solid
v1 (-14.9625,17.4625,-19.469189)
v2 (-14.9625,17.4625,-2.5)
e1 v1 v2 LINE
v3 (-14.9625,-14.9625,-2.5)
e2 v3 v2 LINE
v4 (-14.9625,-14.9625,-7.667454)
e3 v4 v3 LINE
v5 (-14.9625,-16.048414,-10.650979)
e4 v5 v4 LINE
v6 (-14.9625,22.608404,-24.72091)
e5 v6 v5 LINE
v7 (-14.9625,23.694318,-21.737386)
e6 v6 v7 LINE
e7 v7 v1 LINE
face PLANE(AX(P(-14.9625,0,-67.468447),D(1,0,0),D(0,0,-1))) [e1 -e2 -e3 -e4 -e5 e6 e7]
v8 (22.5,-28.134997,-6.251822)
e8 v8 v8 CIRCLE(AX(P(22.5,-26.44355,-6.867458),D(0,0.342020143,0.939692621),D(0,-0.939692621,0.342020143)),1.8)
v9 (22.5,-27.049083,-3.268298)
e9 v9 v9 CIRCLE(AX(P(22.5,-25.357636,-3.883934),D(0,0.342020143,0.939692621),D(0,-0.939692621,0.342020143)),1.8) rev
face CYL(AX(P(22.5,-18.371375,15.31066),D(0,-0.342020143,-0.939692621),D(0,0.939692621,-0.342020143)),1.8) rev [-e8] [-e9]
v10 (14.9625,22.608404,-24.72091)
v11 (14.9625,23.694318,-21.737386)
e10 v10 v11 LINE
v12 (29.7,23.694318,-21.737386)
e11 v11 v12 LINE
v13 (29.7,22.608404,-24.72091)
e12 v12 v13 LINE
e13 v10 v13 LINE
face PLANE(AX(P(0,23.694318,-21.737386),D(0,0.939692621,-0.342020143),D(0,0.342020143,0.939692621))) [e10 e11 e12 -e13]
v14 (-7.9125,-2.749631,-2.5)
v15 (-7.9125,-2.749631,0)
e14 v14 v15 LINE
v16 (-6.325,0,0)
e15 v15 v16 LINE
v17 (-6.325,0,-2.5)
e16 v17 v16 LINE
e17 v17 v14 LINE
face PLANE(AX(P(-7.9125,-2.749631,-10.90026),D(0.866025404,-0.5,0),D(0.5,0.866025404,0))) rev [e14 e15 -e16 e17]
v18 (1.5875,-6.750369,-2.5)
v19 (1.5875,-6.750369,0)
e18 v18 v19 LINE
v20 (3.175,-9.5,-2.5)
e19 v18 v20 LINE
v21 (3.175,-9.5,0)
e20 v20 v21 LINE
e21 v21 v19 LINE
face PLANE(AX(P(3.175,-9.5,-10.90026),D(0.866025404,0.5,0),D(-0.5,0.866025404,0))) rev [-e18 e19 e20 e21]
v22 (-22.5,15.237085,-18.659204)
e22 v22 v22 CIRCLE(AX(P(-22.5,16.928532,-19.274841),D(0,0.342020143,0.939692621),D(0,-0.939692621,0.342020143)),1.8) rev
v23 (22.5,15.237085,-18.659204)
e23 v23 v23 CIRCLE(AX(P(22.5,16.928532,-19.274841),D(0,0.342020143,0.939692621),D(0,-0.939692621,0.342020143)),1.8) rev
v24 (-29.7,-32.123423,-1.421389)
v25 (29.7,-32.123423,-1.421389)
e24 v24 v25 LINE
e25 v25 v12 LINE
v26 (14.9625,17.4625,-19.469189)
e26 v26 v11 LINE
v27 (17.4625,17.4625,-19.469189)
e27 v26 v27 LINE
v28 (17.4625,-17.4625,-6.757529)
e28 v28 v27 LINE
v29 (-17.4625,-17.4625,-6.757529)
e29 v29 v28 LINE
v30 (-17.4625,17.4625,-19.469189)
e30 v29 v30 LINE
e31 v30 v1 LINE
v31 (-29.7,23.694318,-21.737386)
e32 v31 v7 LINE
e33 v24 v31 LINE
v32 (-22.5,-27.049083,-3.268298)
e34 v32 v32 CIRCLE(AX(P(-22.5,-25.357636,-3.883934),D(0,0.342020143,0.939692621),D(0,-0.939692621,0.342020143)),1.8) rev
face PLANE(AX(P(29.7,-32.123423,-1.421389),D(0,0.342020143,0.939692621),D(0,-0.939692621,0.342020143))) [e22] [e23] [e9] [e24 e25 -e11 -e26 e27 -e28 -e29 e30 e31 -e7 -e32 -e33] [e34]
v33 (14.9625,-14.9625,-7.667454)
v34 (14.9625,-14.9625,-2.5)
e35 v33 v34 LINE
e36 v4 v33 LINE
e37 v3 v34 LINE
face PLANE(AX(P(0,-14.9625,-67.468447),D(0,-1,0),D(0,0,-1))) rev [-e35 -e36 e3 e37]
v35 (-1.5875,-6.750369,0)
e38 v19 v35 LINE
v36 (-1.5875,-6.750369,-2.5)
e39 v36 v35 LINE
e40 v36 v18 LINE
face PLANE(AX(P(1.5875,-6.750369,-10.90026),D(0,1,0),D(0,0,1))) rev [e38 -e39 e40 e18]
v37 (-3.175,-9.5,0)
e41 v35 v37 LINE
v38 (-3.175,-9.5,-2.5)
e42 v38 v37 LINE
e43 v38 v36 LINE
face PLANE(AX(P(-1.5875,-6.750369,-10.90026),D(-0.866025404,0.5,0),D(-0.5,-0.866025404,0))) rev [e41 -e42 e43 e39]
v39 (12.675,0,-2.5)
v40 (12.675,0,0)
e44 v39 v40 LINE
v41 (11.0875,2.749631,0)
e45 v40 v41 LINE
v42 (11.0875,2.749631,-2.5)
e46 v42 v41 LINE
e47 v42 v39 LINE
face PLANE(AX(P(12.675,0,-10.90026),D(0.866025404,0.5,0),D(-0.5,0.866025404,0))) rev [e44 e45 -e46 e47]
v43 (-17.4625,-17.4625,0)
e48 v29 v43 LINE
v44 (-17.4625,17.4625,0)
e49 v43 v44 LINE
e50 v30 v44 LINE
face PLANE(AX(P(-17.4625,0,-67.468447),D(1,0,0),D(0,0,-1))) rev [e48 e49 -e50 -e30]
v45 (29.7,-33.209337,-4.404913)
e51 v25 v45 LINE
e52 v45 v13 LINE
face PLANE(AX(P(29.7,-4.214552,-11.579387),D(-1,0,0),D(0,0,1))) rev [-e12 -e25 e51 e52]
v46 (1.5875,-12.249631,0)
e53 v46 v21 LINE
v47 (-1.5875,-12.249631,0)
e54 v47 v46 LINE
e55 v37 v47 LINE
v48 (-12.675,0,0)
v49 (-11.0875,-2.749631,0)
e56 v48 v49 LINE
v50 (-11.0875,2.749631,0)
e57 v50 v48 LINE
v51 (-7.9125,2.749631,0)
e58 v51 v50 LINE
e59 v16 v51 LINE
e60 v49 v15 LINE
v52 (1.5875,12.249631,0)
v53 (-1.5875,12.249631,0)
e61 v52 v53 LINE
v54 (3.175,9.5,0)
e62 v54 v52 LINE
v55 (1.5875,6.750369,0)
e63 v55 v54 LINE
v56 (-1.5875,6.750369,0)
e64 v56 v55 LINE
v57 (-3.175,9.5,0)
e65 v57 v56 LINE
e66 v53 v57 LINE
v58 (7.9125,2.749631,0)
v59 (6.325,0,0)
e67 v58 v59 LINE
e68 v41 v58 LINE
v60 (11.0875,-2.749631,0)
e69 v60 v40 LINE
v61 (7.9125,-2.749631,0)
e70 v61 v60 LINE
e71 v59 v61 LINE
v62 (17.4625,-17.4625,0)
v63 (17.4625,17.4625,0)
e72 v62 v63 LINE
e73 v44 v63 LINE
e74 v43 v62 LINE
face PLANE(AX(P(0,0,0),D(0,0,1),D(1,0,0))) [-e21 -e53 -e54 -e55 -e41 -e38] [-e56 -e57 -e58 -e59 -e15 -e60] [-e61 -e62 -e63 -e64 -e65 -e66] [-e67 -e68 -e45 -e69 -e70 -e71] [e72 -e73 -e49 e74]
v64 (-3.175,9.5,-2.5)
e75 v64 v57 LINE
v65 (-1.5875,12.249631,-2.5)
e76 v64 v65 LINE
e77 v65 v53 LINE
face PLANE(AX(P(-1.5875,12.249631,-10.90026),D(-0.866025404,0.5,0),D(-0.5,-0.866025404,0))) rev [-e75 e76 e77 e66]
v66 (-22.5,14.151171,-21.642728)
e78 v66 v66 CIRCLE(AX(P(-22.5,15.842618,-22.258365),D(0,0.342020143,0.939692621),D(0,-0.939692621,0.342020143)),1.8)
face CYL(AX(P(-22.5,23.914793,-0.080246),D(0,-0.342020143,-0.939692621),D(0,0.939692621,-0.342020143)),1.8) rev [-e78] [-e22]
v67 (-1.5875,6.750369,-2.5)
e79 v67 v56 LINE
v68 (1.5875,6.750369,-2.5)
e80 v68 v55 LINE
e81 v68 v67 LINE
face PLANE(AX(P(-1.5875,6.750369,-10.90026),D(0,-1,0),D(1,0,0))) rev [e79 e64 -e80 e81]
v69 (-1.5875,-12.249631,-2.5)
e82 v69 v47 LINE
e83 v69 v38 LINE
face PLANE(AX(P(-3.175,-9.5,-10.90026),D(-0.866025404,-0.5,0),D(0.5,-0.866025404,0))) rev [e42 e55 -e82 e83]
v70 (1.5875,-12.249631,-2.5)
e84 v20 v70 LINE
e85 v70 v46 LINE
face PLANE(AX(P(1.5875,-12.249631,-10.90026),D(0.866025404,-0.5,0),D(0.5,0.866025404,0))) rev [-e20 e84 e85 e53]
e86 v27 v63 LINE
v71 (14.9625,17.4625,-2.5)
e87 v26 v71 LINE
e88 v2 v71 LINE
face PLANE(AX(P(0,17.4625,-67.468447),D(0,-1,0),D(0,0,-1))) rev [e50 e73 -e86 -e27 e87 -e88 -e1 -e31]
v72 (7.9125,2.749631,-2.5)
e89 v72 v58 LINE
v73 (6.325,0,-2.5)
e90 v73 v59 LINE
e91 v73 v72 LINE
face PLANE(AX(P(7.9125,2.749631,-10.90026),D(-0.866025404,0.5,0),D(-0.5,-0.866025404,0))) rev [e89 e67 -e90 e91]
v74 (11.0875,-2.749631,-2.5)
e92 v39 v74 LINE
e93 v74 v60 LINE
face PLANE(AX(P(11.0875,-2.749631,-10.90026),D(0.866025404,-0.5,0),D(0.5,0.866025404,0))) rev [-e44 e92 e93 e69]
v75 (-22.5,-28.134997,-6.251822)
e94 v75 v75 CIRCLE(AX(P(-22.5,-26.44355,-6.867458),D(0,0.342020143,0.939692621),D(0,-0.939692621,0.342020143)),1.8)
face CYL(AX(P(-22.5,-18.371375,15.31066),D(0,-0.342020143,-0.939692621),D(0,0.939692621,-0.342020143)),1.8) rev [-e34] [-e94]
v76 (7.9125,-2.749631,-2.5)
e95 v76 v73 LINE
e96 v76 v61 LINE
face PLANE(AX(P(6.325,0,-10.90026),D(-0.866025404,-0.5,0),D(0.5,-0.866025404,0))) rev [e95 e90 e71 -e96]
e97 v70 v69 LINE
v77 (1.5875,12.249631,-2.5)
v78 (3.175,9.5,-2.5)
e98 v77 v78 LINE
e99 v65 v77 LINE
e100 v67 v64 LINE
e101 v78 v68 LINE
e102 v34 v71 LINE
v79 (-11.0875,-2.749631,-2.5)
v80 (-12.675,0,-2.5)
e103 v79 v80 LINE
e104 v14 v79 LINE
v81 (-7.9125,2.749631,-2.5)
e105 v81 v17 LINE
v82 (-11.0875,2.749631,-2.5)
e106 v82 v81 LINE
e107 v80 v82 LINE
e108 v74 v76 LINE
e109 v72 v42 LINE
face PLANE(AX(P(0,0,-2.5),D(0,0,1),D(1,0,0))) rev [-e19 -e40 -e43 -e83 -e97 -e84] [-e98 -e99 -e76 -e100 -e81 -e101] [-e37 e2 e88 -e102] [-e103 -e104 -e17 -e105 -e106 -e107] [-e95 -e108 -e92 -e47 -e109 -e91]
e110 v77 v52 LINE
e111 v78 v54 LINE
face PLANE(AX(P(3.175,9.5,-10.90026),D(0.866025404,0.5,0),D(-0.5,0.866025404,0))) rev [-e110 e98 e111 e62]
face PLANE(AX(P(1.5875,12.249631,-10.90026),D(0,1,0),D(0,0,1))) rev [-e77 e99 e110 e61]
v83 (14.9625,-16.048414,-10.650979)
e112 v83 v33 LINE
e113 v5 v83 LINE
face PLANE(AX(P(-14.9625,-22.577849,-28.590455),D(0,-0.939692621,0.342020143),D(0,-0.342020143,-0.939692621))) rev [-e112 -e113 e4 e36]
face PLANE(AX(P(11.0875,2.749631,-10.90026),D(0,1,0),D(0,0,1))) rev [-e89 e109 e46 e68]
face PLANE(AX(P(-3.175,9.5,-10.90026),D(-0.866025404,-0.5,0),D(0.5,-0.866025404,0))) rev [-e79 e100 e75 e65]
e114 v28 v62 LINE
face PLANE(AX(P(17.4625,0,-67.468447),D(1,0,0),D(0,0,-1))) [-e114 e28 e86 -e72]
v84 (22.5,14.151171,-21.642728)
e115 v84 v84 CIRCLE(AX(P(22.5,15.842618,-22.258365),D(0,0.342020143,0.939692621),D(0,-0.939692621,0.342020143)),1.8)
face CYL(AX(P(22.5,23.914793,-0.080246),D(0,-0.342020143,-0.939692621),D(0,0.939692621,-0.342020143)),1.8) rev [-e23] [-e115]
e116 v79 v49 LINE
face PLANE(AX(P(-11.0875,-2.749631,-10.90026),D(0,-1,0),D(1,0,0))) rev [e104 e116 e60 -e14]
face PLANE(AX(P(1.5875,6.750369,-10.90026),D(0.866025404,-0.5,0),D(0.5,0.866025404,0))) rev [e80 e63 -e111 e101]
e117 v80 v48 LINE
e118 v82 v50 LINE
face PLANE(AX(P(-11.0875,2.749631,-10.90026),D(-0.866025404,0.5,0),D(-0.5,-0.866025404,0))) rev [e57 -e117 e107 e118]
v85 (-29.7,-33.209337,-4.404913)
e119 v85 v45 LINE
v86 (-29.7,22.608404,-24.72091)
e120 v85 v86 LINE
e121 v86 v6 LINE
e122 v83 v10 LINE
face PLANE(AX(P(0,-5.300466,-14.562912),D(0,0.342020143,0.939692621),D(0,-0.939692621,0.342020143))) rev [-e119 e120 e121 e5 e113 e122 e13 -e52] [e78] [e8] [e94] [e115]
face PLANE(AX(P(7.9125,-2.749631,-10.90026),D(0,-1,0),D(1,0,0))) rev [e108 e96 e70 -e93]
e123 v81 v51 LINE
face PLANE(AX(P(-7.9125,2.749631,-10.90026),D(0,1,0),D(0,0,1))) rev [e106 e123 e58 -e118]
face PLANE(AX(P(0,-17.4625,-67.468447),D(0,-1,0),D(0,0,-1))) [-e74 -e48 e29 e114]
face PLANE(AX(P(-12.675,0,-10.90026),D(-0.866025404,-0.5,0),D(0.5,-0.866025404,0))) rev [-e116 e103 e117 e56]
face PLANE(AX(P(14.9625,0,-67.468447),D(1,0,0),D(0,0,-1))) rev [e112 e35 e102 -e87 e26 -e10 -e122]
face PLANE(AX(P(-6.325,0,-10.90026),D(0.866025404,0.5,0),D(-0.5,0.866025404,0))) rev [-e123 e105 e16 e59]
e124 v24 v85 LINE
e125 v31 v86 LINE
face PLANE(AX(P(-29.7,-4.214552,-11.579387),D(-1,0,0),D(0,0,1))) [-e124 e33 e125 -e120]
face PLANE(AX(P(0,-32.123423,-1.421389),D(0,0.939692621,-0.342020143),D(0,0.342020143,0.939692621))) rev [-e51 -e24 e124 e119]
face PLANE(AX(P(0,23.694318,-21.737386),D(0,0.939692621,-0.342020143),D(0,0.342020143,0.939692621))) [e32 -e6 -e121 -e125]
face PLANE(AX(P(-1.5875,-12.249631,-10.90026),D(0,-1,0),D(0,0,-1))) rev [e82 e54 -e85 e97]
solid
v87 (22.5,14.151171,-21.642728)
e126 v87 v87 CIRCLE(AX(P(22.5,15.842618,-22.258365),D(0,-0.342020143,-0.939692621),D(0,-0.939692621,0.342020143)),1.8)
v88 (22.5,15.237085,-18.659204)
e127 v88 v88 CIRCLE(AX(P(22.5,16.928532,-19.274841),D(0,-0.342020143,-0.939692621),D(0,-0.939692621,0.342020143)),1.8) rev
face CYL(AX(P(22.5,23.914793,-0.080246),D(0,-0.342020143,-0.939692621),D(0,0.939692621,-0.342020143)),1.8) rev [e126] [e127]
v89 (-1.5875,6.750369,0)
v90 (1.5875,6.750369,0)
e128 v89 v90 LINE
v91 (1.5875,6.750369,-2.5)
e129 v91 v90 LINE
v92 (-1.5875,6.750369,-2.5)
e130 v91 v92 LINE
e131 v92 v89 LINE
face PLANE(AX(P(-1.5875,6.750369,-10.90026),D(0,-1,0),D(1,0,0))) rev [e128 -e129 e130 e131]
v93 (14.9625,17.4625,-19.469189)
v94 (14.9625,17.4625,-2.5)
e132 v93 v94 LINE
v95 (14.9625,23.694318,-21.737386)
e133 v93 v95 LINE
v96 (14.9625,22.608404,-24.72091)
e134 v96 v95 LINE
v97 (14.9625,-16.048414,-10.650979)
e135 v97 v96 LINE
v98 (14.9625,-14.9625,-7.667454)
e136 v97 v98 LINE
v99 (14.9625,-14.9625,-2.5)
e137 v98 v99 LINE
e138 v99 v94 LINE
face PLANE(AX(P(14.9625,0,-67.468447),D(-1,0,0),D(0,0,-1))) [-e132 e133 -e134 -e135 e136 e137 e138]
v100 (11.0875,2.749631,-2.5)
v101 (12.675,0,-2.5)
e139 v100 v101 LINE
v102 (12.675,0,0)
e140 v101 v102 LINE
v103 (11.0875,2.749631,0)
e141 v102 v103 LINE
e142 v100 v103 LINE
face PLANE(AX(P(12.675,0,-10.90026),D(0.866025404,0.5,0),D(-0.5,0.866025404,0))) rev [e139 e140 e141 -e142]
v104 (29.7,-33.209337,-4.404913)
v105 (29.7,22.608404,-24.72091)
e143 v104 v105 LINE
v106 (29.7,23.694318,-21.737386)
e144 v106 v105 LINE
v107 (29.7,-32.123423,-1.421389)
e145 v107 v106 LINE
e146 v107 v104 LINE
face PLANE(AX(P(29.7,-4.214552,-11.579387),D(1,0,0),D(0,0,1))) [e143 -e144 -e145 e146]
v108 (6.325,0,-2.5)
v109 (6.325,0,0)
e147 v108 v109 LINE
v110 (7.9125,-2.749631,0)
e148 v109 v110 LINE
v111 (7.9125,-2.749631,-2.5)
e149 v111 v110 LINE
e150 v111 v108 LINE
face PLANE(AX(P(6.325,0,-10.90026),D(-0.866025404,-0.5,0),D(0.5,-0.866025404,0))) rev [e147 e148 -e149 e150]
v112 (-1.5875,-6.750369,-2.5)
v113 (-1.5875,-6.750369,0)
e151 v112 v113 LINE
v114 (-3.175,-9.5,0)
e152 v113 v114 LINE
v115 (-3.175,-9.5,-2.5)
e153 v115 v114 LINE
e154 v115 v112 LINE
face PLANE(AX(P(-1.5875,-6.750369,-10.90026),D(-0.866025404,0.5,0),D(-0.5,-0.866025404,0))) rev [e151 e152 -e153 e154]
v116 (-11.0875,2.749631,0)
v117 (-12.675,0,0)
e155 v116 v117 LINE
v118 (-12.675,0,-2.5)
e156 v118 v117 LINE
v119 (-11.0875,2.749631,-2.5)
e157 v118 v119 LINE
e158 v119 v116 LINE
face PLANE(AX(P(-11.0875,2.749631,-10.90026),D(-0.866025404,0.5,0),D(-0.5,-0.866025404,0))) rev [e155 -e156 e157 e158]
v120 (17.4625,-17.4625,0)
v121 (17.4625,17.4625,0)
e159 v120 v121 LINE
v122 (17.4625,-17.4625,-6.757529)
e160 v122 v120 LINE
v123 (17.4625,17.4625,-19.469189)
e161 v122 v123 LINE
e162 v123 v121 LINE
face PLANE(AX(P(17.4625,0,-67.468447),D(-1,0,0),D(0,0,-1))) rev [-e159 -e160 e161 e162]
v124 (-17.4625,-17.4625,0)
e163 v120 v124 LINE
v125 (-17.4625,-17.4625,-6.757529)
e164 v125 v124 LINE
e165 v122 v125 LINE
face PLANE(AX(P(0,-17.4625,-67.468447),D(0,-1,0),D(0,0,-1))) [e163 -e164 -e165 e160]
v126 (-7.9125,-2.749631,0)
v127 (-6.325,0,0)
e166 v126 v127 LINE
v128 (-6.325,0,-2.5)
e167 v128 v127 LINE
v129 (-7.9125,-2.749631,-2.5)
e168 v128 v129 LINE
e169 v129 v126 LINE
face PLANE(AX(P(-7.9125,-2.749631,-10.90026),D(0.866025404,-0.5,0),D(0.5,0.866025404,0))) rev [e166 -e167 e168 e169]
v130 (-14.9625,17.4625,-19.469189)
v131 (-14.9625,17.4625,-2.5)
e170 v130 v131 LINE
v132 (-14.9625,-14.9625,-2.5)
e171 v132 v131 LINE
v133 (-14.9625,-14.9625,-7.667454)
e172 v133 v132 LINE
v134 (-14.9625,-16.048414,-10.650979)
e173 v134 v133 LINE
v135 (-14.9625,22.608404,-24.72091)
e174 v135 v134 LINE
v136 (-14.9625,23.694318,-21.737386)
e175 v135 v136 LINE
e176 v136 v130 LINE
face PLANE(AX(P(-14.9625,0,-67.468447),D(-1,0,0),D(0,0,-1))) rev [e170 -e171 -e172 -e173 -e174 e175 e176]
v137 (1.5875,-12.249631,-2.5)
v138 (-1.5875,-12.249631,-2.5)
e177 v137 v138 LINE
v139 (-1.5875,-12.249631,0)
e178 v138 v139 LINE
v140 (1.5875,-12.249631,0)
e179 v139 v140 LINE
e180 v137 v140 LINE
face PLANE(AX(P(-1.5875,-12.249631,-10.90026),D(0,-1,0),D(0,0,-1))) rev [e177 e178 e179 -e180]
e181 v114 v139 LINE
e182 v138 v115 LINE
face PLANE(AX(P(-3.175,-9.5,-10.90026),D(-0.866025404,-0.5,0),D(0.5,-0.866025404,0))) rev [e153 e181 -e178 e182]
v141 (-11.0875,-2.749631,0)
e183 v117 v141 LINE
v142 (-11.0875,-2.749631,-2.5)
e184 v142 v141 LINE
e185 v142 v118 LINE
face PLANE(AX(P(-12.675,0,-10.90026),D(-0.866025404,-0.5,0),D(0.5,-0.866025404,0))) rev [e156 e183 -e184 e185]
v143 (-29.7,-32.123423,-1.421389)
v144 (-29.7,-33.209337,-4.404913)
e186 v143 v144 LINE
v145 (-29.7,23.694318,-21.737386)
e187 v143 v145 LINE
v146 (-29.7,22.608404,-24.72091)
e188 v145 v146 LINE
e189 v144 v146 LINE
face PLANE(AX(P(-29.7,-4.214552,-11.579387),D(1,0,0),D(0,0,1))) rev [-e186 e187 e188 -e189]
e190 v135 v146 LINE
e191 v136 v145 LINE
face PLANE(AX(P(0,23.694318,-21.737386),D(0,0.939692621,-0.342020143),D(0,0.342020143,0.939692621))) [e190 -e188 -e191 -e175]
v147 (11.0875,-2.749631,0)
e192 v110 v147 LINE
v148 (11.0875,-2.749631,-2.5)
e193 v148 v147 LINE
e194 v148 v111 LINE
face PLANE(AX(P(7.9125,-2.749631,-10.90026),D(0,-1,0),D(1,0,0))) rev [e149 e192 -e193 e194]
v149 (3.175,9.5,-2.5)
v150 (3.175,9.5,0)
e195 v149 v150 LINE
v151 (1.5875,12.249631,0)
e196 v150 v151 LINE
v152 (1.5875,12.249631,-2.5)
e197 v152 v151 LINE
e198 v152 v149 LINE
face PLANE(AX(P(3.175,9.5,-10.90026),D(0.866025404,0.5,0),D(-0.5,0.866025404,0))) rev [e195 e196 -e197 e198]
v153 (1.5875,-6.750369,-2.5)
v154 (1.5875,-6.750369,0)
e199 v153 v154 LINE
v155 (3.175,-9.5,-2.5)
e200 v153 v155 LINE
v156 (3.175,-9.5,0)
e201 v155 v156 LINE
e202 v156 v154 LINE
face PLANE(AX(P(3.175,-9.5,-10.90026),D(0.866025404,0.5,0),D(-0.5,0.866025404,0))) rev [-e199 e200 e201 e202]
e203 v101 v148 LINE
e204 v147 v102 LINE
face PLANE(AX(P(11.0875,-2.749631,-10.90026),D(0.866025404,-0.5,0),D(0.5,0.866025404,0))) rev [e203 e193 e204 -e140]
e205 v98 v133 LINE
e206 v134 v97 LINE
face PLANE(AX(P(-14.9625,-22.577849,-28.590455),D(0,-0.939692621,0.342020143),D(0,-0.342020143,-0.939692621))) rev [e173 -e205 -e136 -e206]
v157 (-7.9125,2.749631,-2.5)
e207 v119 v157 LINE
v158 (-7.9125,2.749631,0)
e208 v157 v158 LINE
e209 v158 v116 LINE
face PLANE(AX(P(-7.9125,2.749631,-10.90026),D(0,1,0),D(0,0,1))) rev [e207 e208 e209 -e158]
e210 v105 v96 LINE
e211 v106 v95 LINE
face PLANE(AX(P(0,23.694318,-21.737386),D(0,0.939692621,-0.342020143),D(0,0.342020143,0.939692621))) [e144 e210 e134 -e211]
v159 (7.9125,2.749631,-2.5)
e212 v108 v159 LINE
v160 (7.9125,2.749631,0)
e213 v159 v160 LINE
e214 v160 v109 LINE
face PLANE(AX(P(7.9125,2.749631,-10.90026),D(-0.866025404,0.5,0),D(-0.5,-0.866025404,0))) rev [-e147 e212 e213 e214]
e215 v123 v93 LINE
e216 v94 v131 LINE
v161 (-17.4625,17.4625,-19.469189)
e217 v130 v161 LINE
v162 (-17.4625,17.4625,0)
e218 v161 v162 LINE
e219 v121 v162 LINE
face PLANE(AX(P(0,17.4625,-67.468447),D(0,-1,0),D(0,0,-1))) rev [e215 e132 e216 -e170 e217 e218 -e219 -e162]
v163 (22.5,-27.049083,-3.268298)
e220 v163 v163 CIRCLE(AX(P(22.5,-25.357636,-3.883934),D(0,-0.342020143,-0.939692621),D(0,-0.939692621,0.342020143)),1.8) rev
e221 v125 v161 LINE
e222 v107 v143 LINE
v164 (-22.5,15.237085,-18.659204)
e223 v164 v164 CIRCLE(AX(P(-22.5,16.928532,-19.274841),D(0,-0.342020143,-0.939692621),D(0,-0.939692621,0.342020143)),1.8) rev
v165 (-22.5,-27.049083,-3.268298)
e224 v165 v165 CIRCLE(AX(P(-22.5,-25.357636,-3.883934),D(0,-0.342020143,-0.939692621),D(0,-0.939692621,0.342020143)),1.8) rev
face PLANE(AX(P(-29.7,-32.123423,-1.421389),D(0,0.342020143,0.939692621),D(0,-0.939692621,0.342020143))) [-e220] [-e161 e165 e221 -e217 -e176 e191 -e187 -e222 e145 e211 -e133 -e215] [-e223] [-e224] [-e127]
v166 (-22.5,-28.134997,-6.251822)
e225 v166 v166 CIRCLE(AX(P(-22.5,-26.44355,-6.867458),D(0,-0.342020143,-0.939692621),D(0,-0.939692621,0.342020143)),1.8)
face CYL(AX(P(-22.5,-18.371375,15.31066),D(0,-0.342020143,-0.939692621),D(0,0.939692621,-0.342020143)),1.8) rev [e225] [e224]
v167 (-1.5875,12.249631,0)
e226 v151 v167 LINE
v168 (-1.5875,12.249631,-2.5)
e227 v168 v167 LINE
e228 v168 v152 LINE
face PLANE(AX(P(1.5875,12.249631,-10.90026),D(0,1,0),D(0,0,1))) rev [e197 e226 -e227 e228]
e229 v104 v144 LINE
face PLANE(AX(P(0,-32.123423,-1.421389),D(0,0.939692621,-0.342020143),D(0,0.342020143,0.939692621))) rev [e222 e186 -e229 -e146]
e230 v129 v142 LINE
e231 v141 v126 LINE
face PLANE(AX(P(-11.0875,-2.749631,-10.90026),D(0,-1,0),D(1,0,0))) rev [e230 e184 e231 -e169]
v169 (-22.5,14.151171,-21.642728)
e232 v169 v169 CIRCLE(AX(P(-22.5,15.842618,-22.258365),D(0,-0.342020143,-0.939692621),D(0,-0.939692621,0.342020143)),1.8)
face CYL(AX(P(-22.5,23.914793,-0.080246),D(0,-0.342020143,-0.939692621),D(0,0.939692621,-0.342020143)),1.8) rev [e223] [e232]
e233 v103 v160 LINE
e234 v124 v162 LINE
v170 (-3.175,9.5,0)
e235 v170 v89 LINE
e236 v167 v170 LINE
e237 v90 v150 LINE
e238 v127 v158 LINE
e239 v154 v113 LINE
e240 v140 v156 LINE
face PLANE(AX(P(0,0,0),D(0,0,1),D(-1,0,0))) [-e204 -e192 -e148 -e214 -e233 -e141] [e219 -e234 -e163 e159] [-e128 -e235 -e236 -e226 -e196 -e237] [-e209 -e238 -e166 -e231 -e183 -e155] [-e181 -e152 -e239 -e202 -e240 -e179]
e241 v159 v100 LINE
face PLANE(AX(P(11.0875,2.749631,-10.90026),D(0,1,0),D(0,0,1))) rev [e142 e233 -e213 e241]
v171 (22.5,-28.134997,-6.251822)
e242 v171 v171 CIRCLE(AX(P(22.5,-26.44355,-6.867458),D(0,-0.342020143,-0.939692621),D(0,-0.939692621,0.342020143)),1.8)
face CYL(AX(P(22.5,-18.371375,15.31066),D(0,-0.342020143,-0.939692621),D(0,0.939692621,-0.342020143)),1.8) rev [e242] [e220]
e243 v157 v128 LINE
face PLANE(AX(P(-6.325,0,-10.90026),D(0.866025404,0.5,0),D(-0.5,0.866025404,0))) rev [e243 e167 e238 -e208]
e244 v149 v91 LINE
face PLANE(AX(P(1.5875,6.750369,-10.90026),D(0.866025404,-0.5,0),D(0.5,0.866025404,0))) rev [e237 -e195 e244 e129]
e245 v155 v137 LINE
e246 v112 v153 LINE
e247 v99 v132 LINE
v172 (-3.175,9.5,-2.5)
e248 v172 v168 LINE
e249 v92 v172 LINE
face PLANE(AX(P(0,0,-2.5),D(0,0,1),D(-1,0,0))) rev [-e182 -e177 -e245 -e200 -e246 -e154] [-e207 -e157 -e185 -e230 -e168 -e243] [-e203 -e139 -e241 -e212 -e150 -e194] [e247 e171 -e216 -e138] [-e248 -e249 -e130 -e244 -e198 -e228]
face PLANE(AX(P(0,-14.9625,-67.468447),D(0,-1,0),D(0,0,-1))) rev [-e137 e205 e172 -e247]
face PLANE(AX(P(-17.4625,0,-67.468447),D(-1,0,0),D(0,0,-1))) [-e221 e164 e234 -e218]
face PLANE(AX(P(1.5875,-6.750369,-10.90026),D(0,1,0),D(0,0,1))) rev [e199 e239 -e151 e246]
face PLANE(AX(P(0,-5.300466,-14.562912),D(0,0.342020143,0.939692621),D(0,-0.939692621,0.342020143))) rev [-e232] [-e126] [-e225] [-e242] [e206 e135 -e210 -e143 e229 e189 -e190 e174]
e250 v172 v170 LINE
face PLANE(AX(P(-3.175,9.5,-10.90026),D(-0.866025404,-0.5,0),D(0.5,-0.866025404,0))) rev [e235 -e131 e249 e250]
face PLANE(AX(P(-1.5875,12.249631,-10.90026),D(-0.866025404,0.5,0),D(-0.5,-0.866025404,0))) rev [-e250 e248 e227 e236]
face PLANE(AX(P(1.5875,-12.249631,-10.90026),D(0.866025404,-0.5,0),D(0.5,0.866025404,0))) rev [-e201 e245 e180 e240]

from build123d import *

# Parameters (mm, degrees)
SKETCH5_W           = 59.399999564
SKETCH5_H           = 59.399999564
BOSS_EXTRUDE3_DEPTH = 3.175
BOSS_EXTRUDE4_REACH = 52.952
SKETCH1_W           = 34.925
SKETCH1_H           = 34.925
SKETCH5_5_R         = 1.799999956
CUT_EXTRUDE5_DEPTH  = 44.987110755
SHELL1_T            = -2.5
SKETCH8_R           = 1.56250005
CUT_EXTRUDE4_DEPTH  = 2.5
SKETCH10_W          = 10
SKETCH10_H          = 6
CUT_EXTRUDE7_DEPTH  = 3.175
CUT_EXTRUDE9_DEPTH  = 2.5
SKETCH16_W          = 29.925
SKETCH16_H          = 41.137726754
CUT_EXTRUDE11_DEPTH = 44.537192462


# Read off the part's stored shape, not the designer's step: Split1
with BuildPart() as part:
    # Sketch5 → Boss-Extrude3 (new body)
    with BuildSketch(Plane(origin=(0, -5.300466321, -14.56291153), x_dir=(1, 0, 0), z_dir=(0, 0.3420201433256694, 0.9396926207859082))):
        Rectangle(SKETCH5_W, SKETCH5_H)
    extrude(amount=BOSS_EXTRUDE3_DEPTH)

    # Boss-Extrude4: up to this plane
    boss_extrude4_end = Plane(origin=(0, -4.214552366, -11.579387459), z_dir=(0, 0.34202014332566943, 0.9396926207859083))
    # Sketch1 → Boss-Extrude4 (add, up to the surface)
    with BuildSketch(Plane.XY, mode=Mode.PRIVATE) as boss_extrude4_sk1:
        Rectangle(SKETCH1_W, SKETCH1_H)
    boss_extrude4_tool1 = split(extrude(boss_extrude4_sk1.sketch, amount=-BOSS_EXTRUDE4_REACH, mode=Mode.PRIVATE), bisect_by=boss_extrude4_end, keep=Keep.BOTH, mode=Mode.PRIVATE)
    add(boss_extrude4_tool1.solids().sort_by_distance((0, 0, 0))[0])

    # Sketch5<5> → Cut-Extrude5 (cut, through all)
    with BuildSketch(Plane(origin=(0, -5.300466321, -14.56291153), x_dir=(1, 0, 0), z_dir=(0, 0.3420201433256694, 0.9396926207859082))):
        with Locations(Location((-22.499999958, -22.499999958, 0), (0, 0, 270))):
            Circle(SKETCH5_5_R)
        with Locations(Location((-22.499999958, 22.499999958, 0), (0, 0, 270))):
            Circle(SKETCH5_5_R)
        with Locations(Location((22.499999958, 22.499999958, 0), (0, 0, 270))):
            Circle(SKETCH5_5_R)
        with Locations(Location((22.499999958, -22.499999958, 0), (0, 0, 270))):
            Circle(SKETCH5_5_R)
    extrude(amount=CUT_EXTRUDE5_DEPTH, mode=Mode.SUBTRACT)


with BuildPart() as body_2:
    # Split1: the piece on the far side of the plane
    add(part.part)
    split(bisect_by=Plane(origin=(0, -4.214552366, -11.579387459), x_dir=(1, 0, 0), z_dir=(0, 0.3420201433256691, 0.9396926207859083)), keep=Keep.BOTTOM)


with BuildPart() as part_1:
    add(part.part)

    # Split1
    split(bisect_by=Plane(origin=(0, -4.214552366, -11.579387459), x_dir=(1, 0, 0), z_dir=(0, 0.3420201433256691, 0.9396926207859083)), keep=Keep.TOP)

    # Shell1
    shell1_openings = [part_1.faces().sort_by_distance(p)[0] for p in [
        (0, 17.4625, -9.734594643),
        (0, 0, -13.113359071),
    ]]
    offset(amount=SHELL1_T, openings=shell1_openings, kind=Kind.INTERSECTION)

    # Sketch8 → Cut-Extrude4 (cut)
    with BuildSketch(Plane.XY):
        with Locations((0, 9.50000005)):
            Circle(SKETCH8_R)
        with Locations((9.50000005, 0)):
            Circle(SKETCH8_R)
        with Locations((0, -9.50000005)):
            Circle(SKETCH8_R)
        with Locations((-9.50000005, 0)):
            Circle(SKETCH8_R)
    extrude(amount=-CUT_EXTRUDE4_DEPTH, mode=Mode.SUBTRACT)

    # Combine1: union body 2
    add(body_2.part)


with BuildPart() as body_2_2:
    # Mirror4: mirrored copy
    add(part_1.part.mirror(Plane(origin=(0, 0, 0), x_dir=(0, 0, 1), z_dir=(1, 0, 0))))


with BuildPart() as cut_extrude7_tool:
    # Sketch10 → Cut-Extrude7 (new body)
    with BuildSketch(Plane(origin=(0, -5.300466321, -14.56291153), x_dir=(-1, 0, 0), z_dir=(0, -0.3420201433256695, -0.9396926207859082))):
        with Locations((4, 11)):
            Rectangle(SKETCH10_W, SKETCH10_H)
    extrude(amount=-CUT_EXTRUDE7_DEPTH)


with BuildPart() as part_2:
    add(part_1.part)

    # Cut-Extrude7: cut by cut_extrude7_tool
    add(cut_extrude7_tool.part, mode=Mode.SUBTRACT)


with BuildPart() as body_2_2_1:
    add(body_2_2.part)

    # Cut-Extrude7: cut by cut_extrude7_tool
    add(cut_extrude7_tool.part, mode=Mode.SUBTRACT)


with BuildPart() as cut_extrude9_tool:
    # Sketch11 → Cut-Extrude9 (new body)
    with BuildSketch(Plane.XY):
        Polygon((1.5875, 12.249630707), (-1.5875, 12.249630707), (-3.175, 9.50000005), (-1.5875, 6.750369393), (1.5875, 6.750369393), (3.175, 9.50000005), align=None)
        Polygon((11.08750005, 2.749630657), (7.91250005, 2.749630657), (6.32500005, 0), (7.91250005, -2.749630657), (11.08750005, -2.749630657), (12.67500005, 0), align=None)
        Polygon((1.5875, -6.750369393), (-1.5875, -6.750369393), (-3.175, -9.50000005), (-1.5875, -12.249630707), (1.5875, -12.249630707), (3.175, -9.50000005), align=None)
        Polygon((-7.91250005, 2.749630657), (-11.08750005, 2.749630657), (-12.67500005, 0), (-11.08750005, -2.749630657), (-7.91250005, -2.749630657), (-6.32500005, 0), align=None)
    extrude(amount=-CUT_EXTRUDE9_DEPTH)


with BuildPart() as part_3:
    add(part_2.part)

    # Cut-Extrude9: cut by cut_extrude9_tool
    add(cut_extrude9_tool.part, mode=Mode.SUBTRACT)


with BuildPart() as body_2_2_2:
    add(body_2_2_1.part)

    # Cut-Extrude9: cut by cut_extrude9_tool
    add(cut_extrude9_tool.part, mode=Mode.SUBTRACT)


with BuildPart() as cut_extrude11_tool:
    # Sketch16 → Cut-Extrude11 (new, through all)
    with BuildSketch(Plane(origin=(0, -4.214552366, -11.579387459), x_dir=(1, 0, 0), z_dir=(0, 0.34202014332566943, 0.9396926207859083))):
        with Locations((0, 9.131136405)):
            Rectangle(SKETCH16_W, SKETCH16_H)
    extrude(amount=-CUT_EXTRUDE11_DEPTH)


with BuildPart() as part_4:
    add(part_3.part)

    # Cut-Extrude11: cut by cut_extrude11_tool
    add(cut_extrude11_tool.part, mode=Mode.SUBTRACT)


with BuildPart() as body_2_2_3:
    add(body_2_2_2.part)

    # Cut-Extrude11: cut by cut_extrude11_tool
    add(cut_extrude11_tool.part, mode=Mode.SUBTRACT)


solid = Compound([part_4.part, body_2_2_3.part])
